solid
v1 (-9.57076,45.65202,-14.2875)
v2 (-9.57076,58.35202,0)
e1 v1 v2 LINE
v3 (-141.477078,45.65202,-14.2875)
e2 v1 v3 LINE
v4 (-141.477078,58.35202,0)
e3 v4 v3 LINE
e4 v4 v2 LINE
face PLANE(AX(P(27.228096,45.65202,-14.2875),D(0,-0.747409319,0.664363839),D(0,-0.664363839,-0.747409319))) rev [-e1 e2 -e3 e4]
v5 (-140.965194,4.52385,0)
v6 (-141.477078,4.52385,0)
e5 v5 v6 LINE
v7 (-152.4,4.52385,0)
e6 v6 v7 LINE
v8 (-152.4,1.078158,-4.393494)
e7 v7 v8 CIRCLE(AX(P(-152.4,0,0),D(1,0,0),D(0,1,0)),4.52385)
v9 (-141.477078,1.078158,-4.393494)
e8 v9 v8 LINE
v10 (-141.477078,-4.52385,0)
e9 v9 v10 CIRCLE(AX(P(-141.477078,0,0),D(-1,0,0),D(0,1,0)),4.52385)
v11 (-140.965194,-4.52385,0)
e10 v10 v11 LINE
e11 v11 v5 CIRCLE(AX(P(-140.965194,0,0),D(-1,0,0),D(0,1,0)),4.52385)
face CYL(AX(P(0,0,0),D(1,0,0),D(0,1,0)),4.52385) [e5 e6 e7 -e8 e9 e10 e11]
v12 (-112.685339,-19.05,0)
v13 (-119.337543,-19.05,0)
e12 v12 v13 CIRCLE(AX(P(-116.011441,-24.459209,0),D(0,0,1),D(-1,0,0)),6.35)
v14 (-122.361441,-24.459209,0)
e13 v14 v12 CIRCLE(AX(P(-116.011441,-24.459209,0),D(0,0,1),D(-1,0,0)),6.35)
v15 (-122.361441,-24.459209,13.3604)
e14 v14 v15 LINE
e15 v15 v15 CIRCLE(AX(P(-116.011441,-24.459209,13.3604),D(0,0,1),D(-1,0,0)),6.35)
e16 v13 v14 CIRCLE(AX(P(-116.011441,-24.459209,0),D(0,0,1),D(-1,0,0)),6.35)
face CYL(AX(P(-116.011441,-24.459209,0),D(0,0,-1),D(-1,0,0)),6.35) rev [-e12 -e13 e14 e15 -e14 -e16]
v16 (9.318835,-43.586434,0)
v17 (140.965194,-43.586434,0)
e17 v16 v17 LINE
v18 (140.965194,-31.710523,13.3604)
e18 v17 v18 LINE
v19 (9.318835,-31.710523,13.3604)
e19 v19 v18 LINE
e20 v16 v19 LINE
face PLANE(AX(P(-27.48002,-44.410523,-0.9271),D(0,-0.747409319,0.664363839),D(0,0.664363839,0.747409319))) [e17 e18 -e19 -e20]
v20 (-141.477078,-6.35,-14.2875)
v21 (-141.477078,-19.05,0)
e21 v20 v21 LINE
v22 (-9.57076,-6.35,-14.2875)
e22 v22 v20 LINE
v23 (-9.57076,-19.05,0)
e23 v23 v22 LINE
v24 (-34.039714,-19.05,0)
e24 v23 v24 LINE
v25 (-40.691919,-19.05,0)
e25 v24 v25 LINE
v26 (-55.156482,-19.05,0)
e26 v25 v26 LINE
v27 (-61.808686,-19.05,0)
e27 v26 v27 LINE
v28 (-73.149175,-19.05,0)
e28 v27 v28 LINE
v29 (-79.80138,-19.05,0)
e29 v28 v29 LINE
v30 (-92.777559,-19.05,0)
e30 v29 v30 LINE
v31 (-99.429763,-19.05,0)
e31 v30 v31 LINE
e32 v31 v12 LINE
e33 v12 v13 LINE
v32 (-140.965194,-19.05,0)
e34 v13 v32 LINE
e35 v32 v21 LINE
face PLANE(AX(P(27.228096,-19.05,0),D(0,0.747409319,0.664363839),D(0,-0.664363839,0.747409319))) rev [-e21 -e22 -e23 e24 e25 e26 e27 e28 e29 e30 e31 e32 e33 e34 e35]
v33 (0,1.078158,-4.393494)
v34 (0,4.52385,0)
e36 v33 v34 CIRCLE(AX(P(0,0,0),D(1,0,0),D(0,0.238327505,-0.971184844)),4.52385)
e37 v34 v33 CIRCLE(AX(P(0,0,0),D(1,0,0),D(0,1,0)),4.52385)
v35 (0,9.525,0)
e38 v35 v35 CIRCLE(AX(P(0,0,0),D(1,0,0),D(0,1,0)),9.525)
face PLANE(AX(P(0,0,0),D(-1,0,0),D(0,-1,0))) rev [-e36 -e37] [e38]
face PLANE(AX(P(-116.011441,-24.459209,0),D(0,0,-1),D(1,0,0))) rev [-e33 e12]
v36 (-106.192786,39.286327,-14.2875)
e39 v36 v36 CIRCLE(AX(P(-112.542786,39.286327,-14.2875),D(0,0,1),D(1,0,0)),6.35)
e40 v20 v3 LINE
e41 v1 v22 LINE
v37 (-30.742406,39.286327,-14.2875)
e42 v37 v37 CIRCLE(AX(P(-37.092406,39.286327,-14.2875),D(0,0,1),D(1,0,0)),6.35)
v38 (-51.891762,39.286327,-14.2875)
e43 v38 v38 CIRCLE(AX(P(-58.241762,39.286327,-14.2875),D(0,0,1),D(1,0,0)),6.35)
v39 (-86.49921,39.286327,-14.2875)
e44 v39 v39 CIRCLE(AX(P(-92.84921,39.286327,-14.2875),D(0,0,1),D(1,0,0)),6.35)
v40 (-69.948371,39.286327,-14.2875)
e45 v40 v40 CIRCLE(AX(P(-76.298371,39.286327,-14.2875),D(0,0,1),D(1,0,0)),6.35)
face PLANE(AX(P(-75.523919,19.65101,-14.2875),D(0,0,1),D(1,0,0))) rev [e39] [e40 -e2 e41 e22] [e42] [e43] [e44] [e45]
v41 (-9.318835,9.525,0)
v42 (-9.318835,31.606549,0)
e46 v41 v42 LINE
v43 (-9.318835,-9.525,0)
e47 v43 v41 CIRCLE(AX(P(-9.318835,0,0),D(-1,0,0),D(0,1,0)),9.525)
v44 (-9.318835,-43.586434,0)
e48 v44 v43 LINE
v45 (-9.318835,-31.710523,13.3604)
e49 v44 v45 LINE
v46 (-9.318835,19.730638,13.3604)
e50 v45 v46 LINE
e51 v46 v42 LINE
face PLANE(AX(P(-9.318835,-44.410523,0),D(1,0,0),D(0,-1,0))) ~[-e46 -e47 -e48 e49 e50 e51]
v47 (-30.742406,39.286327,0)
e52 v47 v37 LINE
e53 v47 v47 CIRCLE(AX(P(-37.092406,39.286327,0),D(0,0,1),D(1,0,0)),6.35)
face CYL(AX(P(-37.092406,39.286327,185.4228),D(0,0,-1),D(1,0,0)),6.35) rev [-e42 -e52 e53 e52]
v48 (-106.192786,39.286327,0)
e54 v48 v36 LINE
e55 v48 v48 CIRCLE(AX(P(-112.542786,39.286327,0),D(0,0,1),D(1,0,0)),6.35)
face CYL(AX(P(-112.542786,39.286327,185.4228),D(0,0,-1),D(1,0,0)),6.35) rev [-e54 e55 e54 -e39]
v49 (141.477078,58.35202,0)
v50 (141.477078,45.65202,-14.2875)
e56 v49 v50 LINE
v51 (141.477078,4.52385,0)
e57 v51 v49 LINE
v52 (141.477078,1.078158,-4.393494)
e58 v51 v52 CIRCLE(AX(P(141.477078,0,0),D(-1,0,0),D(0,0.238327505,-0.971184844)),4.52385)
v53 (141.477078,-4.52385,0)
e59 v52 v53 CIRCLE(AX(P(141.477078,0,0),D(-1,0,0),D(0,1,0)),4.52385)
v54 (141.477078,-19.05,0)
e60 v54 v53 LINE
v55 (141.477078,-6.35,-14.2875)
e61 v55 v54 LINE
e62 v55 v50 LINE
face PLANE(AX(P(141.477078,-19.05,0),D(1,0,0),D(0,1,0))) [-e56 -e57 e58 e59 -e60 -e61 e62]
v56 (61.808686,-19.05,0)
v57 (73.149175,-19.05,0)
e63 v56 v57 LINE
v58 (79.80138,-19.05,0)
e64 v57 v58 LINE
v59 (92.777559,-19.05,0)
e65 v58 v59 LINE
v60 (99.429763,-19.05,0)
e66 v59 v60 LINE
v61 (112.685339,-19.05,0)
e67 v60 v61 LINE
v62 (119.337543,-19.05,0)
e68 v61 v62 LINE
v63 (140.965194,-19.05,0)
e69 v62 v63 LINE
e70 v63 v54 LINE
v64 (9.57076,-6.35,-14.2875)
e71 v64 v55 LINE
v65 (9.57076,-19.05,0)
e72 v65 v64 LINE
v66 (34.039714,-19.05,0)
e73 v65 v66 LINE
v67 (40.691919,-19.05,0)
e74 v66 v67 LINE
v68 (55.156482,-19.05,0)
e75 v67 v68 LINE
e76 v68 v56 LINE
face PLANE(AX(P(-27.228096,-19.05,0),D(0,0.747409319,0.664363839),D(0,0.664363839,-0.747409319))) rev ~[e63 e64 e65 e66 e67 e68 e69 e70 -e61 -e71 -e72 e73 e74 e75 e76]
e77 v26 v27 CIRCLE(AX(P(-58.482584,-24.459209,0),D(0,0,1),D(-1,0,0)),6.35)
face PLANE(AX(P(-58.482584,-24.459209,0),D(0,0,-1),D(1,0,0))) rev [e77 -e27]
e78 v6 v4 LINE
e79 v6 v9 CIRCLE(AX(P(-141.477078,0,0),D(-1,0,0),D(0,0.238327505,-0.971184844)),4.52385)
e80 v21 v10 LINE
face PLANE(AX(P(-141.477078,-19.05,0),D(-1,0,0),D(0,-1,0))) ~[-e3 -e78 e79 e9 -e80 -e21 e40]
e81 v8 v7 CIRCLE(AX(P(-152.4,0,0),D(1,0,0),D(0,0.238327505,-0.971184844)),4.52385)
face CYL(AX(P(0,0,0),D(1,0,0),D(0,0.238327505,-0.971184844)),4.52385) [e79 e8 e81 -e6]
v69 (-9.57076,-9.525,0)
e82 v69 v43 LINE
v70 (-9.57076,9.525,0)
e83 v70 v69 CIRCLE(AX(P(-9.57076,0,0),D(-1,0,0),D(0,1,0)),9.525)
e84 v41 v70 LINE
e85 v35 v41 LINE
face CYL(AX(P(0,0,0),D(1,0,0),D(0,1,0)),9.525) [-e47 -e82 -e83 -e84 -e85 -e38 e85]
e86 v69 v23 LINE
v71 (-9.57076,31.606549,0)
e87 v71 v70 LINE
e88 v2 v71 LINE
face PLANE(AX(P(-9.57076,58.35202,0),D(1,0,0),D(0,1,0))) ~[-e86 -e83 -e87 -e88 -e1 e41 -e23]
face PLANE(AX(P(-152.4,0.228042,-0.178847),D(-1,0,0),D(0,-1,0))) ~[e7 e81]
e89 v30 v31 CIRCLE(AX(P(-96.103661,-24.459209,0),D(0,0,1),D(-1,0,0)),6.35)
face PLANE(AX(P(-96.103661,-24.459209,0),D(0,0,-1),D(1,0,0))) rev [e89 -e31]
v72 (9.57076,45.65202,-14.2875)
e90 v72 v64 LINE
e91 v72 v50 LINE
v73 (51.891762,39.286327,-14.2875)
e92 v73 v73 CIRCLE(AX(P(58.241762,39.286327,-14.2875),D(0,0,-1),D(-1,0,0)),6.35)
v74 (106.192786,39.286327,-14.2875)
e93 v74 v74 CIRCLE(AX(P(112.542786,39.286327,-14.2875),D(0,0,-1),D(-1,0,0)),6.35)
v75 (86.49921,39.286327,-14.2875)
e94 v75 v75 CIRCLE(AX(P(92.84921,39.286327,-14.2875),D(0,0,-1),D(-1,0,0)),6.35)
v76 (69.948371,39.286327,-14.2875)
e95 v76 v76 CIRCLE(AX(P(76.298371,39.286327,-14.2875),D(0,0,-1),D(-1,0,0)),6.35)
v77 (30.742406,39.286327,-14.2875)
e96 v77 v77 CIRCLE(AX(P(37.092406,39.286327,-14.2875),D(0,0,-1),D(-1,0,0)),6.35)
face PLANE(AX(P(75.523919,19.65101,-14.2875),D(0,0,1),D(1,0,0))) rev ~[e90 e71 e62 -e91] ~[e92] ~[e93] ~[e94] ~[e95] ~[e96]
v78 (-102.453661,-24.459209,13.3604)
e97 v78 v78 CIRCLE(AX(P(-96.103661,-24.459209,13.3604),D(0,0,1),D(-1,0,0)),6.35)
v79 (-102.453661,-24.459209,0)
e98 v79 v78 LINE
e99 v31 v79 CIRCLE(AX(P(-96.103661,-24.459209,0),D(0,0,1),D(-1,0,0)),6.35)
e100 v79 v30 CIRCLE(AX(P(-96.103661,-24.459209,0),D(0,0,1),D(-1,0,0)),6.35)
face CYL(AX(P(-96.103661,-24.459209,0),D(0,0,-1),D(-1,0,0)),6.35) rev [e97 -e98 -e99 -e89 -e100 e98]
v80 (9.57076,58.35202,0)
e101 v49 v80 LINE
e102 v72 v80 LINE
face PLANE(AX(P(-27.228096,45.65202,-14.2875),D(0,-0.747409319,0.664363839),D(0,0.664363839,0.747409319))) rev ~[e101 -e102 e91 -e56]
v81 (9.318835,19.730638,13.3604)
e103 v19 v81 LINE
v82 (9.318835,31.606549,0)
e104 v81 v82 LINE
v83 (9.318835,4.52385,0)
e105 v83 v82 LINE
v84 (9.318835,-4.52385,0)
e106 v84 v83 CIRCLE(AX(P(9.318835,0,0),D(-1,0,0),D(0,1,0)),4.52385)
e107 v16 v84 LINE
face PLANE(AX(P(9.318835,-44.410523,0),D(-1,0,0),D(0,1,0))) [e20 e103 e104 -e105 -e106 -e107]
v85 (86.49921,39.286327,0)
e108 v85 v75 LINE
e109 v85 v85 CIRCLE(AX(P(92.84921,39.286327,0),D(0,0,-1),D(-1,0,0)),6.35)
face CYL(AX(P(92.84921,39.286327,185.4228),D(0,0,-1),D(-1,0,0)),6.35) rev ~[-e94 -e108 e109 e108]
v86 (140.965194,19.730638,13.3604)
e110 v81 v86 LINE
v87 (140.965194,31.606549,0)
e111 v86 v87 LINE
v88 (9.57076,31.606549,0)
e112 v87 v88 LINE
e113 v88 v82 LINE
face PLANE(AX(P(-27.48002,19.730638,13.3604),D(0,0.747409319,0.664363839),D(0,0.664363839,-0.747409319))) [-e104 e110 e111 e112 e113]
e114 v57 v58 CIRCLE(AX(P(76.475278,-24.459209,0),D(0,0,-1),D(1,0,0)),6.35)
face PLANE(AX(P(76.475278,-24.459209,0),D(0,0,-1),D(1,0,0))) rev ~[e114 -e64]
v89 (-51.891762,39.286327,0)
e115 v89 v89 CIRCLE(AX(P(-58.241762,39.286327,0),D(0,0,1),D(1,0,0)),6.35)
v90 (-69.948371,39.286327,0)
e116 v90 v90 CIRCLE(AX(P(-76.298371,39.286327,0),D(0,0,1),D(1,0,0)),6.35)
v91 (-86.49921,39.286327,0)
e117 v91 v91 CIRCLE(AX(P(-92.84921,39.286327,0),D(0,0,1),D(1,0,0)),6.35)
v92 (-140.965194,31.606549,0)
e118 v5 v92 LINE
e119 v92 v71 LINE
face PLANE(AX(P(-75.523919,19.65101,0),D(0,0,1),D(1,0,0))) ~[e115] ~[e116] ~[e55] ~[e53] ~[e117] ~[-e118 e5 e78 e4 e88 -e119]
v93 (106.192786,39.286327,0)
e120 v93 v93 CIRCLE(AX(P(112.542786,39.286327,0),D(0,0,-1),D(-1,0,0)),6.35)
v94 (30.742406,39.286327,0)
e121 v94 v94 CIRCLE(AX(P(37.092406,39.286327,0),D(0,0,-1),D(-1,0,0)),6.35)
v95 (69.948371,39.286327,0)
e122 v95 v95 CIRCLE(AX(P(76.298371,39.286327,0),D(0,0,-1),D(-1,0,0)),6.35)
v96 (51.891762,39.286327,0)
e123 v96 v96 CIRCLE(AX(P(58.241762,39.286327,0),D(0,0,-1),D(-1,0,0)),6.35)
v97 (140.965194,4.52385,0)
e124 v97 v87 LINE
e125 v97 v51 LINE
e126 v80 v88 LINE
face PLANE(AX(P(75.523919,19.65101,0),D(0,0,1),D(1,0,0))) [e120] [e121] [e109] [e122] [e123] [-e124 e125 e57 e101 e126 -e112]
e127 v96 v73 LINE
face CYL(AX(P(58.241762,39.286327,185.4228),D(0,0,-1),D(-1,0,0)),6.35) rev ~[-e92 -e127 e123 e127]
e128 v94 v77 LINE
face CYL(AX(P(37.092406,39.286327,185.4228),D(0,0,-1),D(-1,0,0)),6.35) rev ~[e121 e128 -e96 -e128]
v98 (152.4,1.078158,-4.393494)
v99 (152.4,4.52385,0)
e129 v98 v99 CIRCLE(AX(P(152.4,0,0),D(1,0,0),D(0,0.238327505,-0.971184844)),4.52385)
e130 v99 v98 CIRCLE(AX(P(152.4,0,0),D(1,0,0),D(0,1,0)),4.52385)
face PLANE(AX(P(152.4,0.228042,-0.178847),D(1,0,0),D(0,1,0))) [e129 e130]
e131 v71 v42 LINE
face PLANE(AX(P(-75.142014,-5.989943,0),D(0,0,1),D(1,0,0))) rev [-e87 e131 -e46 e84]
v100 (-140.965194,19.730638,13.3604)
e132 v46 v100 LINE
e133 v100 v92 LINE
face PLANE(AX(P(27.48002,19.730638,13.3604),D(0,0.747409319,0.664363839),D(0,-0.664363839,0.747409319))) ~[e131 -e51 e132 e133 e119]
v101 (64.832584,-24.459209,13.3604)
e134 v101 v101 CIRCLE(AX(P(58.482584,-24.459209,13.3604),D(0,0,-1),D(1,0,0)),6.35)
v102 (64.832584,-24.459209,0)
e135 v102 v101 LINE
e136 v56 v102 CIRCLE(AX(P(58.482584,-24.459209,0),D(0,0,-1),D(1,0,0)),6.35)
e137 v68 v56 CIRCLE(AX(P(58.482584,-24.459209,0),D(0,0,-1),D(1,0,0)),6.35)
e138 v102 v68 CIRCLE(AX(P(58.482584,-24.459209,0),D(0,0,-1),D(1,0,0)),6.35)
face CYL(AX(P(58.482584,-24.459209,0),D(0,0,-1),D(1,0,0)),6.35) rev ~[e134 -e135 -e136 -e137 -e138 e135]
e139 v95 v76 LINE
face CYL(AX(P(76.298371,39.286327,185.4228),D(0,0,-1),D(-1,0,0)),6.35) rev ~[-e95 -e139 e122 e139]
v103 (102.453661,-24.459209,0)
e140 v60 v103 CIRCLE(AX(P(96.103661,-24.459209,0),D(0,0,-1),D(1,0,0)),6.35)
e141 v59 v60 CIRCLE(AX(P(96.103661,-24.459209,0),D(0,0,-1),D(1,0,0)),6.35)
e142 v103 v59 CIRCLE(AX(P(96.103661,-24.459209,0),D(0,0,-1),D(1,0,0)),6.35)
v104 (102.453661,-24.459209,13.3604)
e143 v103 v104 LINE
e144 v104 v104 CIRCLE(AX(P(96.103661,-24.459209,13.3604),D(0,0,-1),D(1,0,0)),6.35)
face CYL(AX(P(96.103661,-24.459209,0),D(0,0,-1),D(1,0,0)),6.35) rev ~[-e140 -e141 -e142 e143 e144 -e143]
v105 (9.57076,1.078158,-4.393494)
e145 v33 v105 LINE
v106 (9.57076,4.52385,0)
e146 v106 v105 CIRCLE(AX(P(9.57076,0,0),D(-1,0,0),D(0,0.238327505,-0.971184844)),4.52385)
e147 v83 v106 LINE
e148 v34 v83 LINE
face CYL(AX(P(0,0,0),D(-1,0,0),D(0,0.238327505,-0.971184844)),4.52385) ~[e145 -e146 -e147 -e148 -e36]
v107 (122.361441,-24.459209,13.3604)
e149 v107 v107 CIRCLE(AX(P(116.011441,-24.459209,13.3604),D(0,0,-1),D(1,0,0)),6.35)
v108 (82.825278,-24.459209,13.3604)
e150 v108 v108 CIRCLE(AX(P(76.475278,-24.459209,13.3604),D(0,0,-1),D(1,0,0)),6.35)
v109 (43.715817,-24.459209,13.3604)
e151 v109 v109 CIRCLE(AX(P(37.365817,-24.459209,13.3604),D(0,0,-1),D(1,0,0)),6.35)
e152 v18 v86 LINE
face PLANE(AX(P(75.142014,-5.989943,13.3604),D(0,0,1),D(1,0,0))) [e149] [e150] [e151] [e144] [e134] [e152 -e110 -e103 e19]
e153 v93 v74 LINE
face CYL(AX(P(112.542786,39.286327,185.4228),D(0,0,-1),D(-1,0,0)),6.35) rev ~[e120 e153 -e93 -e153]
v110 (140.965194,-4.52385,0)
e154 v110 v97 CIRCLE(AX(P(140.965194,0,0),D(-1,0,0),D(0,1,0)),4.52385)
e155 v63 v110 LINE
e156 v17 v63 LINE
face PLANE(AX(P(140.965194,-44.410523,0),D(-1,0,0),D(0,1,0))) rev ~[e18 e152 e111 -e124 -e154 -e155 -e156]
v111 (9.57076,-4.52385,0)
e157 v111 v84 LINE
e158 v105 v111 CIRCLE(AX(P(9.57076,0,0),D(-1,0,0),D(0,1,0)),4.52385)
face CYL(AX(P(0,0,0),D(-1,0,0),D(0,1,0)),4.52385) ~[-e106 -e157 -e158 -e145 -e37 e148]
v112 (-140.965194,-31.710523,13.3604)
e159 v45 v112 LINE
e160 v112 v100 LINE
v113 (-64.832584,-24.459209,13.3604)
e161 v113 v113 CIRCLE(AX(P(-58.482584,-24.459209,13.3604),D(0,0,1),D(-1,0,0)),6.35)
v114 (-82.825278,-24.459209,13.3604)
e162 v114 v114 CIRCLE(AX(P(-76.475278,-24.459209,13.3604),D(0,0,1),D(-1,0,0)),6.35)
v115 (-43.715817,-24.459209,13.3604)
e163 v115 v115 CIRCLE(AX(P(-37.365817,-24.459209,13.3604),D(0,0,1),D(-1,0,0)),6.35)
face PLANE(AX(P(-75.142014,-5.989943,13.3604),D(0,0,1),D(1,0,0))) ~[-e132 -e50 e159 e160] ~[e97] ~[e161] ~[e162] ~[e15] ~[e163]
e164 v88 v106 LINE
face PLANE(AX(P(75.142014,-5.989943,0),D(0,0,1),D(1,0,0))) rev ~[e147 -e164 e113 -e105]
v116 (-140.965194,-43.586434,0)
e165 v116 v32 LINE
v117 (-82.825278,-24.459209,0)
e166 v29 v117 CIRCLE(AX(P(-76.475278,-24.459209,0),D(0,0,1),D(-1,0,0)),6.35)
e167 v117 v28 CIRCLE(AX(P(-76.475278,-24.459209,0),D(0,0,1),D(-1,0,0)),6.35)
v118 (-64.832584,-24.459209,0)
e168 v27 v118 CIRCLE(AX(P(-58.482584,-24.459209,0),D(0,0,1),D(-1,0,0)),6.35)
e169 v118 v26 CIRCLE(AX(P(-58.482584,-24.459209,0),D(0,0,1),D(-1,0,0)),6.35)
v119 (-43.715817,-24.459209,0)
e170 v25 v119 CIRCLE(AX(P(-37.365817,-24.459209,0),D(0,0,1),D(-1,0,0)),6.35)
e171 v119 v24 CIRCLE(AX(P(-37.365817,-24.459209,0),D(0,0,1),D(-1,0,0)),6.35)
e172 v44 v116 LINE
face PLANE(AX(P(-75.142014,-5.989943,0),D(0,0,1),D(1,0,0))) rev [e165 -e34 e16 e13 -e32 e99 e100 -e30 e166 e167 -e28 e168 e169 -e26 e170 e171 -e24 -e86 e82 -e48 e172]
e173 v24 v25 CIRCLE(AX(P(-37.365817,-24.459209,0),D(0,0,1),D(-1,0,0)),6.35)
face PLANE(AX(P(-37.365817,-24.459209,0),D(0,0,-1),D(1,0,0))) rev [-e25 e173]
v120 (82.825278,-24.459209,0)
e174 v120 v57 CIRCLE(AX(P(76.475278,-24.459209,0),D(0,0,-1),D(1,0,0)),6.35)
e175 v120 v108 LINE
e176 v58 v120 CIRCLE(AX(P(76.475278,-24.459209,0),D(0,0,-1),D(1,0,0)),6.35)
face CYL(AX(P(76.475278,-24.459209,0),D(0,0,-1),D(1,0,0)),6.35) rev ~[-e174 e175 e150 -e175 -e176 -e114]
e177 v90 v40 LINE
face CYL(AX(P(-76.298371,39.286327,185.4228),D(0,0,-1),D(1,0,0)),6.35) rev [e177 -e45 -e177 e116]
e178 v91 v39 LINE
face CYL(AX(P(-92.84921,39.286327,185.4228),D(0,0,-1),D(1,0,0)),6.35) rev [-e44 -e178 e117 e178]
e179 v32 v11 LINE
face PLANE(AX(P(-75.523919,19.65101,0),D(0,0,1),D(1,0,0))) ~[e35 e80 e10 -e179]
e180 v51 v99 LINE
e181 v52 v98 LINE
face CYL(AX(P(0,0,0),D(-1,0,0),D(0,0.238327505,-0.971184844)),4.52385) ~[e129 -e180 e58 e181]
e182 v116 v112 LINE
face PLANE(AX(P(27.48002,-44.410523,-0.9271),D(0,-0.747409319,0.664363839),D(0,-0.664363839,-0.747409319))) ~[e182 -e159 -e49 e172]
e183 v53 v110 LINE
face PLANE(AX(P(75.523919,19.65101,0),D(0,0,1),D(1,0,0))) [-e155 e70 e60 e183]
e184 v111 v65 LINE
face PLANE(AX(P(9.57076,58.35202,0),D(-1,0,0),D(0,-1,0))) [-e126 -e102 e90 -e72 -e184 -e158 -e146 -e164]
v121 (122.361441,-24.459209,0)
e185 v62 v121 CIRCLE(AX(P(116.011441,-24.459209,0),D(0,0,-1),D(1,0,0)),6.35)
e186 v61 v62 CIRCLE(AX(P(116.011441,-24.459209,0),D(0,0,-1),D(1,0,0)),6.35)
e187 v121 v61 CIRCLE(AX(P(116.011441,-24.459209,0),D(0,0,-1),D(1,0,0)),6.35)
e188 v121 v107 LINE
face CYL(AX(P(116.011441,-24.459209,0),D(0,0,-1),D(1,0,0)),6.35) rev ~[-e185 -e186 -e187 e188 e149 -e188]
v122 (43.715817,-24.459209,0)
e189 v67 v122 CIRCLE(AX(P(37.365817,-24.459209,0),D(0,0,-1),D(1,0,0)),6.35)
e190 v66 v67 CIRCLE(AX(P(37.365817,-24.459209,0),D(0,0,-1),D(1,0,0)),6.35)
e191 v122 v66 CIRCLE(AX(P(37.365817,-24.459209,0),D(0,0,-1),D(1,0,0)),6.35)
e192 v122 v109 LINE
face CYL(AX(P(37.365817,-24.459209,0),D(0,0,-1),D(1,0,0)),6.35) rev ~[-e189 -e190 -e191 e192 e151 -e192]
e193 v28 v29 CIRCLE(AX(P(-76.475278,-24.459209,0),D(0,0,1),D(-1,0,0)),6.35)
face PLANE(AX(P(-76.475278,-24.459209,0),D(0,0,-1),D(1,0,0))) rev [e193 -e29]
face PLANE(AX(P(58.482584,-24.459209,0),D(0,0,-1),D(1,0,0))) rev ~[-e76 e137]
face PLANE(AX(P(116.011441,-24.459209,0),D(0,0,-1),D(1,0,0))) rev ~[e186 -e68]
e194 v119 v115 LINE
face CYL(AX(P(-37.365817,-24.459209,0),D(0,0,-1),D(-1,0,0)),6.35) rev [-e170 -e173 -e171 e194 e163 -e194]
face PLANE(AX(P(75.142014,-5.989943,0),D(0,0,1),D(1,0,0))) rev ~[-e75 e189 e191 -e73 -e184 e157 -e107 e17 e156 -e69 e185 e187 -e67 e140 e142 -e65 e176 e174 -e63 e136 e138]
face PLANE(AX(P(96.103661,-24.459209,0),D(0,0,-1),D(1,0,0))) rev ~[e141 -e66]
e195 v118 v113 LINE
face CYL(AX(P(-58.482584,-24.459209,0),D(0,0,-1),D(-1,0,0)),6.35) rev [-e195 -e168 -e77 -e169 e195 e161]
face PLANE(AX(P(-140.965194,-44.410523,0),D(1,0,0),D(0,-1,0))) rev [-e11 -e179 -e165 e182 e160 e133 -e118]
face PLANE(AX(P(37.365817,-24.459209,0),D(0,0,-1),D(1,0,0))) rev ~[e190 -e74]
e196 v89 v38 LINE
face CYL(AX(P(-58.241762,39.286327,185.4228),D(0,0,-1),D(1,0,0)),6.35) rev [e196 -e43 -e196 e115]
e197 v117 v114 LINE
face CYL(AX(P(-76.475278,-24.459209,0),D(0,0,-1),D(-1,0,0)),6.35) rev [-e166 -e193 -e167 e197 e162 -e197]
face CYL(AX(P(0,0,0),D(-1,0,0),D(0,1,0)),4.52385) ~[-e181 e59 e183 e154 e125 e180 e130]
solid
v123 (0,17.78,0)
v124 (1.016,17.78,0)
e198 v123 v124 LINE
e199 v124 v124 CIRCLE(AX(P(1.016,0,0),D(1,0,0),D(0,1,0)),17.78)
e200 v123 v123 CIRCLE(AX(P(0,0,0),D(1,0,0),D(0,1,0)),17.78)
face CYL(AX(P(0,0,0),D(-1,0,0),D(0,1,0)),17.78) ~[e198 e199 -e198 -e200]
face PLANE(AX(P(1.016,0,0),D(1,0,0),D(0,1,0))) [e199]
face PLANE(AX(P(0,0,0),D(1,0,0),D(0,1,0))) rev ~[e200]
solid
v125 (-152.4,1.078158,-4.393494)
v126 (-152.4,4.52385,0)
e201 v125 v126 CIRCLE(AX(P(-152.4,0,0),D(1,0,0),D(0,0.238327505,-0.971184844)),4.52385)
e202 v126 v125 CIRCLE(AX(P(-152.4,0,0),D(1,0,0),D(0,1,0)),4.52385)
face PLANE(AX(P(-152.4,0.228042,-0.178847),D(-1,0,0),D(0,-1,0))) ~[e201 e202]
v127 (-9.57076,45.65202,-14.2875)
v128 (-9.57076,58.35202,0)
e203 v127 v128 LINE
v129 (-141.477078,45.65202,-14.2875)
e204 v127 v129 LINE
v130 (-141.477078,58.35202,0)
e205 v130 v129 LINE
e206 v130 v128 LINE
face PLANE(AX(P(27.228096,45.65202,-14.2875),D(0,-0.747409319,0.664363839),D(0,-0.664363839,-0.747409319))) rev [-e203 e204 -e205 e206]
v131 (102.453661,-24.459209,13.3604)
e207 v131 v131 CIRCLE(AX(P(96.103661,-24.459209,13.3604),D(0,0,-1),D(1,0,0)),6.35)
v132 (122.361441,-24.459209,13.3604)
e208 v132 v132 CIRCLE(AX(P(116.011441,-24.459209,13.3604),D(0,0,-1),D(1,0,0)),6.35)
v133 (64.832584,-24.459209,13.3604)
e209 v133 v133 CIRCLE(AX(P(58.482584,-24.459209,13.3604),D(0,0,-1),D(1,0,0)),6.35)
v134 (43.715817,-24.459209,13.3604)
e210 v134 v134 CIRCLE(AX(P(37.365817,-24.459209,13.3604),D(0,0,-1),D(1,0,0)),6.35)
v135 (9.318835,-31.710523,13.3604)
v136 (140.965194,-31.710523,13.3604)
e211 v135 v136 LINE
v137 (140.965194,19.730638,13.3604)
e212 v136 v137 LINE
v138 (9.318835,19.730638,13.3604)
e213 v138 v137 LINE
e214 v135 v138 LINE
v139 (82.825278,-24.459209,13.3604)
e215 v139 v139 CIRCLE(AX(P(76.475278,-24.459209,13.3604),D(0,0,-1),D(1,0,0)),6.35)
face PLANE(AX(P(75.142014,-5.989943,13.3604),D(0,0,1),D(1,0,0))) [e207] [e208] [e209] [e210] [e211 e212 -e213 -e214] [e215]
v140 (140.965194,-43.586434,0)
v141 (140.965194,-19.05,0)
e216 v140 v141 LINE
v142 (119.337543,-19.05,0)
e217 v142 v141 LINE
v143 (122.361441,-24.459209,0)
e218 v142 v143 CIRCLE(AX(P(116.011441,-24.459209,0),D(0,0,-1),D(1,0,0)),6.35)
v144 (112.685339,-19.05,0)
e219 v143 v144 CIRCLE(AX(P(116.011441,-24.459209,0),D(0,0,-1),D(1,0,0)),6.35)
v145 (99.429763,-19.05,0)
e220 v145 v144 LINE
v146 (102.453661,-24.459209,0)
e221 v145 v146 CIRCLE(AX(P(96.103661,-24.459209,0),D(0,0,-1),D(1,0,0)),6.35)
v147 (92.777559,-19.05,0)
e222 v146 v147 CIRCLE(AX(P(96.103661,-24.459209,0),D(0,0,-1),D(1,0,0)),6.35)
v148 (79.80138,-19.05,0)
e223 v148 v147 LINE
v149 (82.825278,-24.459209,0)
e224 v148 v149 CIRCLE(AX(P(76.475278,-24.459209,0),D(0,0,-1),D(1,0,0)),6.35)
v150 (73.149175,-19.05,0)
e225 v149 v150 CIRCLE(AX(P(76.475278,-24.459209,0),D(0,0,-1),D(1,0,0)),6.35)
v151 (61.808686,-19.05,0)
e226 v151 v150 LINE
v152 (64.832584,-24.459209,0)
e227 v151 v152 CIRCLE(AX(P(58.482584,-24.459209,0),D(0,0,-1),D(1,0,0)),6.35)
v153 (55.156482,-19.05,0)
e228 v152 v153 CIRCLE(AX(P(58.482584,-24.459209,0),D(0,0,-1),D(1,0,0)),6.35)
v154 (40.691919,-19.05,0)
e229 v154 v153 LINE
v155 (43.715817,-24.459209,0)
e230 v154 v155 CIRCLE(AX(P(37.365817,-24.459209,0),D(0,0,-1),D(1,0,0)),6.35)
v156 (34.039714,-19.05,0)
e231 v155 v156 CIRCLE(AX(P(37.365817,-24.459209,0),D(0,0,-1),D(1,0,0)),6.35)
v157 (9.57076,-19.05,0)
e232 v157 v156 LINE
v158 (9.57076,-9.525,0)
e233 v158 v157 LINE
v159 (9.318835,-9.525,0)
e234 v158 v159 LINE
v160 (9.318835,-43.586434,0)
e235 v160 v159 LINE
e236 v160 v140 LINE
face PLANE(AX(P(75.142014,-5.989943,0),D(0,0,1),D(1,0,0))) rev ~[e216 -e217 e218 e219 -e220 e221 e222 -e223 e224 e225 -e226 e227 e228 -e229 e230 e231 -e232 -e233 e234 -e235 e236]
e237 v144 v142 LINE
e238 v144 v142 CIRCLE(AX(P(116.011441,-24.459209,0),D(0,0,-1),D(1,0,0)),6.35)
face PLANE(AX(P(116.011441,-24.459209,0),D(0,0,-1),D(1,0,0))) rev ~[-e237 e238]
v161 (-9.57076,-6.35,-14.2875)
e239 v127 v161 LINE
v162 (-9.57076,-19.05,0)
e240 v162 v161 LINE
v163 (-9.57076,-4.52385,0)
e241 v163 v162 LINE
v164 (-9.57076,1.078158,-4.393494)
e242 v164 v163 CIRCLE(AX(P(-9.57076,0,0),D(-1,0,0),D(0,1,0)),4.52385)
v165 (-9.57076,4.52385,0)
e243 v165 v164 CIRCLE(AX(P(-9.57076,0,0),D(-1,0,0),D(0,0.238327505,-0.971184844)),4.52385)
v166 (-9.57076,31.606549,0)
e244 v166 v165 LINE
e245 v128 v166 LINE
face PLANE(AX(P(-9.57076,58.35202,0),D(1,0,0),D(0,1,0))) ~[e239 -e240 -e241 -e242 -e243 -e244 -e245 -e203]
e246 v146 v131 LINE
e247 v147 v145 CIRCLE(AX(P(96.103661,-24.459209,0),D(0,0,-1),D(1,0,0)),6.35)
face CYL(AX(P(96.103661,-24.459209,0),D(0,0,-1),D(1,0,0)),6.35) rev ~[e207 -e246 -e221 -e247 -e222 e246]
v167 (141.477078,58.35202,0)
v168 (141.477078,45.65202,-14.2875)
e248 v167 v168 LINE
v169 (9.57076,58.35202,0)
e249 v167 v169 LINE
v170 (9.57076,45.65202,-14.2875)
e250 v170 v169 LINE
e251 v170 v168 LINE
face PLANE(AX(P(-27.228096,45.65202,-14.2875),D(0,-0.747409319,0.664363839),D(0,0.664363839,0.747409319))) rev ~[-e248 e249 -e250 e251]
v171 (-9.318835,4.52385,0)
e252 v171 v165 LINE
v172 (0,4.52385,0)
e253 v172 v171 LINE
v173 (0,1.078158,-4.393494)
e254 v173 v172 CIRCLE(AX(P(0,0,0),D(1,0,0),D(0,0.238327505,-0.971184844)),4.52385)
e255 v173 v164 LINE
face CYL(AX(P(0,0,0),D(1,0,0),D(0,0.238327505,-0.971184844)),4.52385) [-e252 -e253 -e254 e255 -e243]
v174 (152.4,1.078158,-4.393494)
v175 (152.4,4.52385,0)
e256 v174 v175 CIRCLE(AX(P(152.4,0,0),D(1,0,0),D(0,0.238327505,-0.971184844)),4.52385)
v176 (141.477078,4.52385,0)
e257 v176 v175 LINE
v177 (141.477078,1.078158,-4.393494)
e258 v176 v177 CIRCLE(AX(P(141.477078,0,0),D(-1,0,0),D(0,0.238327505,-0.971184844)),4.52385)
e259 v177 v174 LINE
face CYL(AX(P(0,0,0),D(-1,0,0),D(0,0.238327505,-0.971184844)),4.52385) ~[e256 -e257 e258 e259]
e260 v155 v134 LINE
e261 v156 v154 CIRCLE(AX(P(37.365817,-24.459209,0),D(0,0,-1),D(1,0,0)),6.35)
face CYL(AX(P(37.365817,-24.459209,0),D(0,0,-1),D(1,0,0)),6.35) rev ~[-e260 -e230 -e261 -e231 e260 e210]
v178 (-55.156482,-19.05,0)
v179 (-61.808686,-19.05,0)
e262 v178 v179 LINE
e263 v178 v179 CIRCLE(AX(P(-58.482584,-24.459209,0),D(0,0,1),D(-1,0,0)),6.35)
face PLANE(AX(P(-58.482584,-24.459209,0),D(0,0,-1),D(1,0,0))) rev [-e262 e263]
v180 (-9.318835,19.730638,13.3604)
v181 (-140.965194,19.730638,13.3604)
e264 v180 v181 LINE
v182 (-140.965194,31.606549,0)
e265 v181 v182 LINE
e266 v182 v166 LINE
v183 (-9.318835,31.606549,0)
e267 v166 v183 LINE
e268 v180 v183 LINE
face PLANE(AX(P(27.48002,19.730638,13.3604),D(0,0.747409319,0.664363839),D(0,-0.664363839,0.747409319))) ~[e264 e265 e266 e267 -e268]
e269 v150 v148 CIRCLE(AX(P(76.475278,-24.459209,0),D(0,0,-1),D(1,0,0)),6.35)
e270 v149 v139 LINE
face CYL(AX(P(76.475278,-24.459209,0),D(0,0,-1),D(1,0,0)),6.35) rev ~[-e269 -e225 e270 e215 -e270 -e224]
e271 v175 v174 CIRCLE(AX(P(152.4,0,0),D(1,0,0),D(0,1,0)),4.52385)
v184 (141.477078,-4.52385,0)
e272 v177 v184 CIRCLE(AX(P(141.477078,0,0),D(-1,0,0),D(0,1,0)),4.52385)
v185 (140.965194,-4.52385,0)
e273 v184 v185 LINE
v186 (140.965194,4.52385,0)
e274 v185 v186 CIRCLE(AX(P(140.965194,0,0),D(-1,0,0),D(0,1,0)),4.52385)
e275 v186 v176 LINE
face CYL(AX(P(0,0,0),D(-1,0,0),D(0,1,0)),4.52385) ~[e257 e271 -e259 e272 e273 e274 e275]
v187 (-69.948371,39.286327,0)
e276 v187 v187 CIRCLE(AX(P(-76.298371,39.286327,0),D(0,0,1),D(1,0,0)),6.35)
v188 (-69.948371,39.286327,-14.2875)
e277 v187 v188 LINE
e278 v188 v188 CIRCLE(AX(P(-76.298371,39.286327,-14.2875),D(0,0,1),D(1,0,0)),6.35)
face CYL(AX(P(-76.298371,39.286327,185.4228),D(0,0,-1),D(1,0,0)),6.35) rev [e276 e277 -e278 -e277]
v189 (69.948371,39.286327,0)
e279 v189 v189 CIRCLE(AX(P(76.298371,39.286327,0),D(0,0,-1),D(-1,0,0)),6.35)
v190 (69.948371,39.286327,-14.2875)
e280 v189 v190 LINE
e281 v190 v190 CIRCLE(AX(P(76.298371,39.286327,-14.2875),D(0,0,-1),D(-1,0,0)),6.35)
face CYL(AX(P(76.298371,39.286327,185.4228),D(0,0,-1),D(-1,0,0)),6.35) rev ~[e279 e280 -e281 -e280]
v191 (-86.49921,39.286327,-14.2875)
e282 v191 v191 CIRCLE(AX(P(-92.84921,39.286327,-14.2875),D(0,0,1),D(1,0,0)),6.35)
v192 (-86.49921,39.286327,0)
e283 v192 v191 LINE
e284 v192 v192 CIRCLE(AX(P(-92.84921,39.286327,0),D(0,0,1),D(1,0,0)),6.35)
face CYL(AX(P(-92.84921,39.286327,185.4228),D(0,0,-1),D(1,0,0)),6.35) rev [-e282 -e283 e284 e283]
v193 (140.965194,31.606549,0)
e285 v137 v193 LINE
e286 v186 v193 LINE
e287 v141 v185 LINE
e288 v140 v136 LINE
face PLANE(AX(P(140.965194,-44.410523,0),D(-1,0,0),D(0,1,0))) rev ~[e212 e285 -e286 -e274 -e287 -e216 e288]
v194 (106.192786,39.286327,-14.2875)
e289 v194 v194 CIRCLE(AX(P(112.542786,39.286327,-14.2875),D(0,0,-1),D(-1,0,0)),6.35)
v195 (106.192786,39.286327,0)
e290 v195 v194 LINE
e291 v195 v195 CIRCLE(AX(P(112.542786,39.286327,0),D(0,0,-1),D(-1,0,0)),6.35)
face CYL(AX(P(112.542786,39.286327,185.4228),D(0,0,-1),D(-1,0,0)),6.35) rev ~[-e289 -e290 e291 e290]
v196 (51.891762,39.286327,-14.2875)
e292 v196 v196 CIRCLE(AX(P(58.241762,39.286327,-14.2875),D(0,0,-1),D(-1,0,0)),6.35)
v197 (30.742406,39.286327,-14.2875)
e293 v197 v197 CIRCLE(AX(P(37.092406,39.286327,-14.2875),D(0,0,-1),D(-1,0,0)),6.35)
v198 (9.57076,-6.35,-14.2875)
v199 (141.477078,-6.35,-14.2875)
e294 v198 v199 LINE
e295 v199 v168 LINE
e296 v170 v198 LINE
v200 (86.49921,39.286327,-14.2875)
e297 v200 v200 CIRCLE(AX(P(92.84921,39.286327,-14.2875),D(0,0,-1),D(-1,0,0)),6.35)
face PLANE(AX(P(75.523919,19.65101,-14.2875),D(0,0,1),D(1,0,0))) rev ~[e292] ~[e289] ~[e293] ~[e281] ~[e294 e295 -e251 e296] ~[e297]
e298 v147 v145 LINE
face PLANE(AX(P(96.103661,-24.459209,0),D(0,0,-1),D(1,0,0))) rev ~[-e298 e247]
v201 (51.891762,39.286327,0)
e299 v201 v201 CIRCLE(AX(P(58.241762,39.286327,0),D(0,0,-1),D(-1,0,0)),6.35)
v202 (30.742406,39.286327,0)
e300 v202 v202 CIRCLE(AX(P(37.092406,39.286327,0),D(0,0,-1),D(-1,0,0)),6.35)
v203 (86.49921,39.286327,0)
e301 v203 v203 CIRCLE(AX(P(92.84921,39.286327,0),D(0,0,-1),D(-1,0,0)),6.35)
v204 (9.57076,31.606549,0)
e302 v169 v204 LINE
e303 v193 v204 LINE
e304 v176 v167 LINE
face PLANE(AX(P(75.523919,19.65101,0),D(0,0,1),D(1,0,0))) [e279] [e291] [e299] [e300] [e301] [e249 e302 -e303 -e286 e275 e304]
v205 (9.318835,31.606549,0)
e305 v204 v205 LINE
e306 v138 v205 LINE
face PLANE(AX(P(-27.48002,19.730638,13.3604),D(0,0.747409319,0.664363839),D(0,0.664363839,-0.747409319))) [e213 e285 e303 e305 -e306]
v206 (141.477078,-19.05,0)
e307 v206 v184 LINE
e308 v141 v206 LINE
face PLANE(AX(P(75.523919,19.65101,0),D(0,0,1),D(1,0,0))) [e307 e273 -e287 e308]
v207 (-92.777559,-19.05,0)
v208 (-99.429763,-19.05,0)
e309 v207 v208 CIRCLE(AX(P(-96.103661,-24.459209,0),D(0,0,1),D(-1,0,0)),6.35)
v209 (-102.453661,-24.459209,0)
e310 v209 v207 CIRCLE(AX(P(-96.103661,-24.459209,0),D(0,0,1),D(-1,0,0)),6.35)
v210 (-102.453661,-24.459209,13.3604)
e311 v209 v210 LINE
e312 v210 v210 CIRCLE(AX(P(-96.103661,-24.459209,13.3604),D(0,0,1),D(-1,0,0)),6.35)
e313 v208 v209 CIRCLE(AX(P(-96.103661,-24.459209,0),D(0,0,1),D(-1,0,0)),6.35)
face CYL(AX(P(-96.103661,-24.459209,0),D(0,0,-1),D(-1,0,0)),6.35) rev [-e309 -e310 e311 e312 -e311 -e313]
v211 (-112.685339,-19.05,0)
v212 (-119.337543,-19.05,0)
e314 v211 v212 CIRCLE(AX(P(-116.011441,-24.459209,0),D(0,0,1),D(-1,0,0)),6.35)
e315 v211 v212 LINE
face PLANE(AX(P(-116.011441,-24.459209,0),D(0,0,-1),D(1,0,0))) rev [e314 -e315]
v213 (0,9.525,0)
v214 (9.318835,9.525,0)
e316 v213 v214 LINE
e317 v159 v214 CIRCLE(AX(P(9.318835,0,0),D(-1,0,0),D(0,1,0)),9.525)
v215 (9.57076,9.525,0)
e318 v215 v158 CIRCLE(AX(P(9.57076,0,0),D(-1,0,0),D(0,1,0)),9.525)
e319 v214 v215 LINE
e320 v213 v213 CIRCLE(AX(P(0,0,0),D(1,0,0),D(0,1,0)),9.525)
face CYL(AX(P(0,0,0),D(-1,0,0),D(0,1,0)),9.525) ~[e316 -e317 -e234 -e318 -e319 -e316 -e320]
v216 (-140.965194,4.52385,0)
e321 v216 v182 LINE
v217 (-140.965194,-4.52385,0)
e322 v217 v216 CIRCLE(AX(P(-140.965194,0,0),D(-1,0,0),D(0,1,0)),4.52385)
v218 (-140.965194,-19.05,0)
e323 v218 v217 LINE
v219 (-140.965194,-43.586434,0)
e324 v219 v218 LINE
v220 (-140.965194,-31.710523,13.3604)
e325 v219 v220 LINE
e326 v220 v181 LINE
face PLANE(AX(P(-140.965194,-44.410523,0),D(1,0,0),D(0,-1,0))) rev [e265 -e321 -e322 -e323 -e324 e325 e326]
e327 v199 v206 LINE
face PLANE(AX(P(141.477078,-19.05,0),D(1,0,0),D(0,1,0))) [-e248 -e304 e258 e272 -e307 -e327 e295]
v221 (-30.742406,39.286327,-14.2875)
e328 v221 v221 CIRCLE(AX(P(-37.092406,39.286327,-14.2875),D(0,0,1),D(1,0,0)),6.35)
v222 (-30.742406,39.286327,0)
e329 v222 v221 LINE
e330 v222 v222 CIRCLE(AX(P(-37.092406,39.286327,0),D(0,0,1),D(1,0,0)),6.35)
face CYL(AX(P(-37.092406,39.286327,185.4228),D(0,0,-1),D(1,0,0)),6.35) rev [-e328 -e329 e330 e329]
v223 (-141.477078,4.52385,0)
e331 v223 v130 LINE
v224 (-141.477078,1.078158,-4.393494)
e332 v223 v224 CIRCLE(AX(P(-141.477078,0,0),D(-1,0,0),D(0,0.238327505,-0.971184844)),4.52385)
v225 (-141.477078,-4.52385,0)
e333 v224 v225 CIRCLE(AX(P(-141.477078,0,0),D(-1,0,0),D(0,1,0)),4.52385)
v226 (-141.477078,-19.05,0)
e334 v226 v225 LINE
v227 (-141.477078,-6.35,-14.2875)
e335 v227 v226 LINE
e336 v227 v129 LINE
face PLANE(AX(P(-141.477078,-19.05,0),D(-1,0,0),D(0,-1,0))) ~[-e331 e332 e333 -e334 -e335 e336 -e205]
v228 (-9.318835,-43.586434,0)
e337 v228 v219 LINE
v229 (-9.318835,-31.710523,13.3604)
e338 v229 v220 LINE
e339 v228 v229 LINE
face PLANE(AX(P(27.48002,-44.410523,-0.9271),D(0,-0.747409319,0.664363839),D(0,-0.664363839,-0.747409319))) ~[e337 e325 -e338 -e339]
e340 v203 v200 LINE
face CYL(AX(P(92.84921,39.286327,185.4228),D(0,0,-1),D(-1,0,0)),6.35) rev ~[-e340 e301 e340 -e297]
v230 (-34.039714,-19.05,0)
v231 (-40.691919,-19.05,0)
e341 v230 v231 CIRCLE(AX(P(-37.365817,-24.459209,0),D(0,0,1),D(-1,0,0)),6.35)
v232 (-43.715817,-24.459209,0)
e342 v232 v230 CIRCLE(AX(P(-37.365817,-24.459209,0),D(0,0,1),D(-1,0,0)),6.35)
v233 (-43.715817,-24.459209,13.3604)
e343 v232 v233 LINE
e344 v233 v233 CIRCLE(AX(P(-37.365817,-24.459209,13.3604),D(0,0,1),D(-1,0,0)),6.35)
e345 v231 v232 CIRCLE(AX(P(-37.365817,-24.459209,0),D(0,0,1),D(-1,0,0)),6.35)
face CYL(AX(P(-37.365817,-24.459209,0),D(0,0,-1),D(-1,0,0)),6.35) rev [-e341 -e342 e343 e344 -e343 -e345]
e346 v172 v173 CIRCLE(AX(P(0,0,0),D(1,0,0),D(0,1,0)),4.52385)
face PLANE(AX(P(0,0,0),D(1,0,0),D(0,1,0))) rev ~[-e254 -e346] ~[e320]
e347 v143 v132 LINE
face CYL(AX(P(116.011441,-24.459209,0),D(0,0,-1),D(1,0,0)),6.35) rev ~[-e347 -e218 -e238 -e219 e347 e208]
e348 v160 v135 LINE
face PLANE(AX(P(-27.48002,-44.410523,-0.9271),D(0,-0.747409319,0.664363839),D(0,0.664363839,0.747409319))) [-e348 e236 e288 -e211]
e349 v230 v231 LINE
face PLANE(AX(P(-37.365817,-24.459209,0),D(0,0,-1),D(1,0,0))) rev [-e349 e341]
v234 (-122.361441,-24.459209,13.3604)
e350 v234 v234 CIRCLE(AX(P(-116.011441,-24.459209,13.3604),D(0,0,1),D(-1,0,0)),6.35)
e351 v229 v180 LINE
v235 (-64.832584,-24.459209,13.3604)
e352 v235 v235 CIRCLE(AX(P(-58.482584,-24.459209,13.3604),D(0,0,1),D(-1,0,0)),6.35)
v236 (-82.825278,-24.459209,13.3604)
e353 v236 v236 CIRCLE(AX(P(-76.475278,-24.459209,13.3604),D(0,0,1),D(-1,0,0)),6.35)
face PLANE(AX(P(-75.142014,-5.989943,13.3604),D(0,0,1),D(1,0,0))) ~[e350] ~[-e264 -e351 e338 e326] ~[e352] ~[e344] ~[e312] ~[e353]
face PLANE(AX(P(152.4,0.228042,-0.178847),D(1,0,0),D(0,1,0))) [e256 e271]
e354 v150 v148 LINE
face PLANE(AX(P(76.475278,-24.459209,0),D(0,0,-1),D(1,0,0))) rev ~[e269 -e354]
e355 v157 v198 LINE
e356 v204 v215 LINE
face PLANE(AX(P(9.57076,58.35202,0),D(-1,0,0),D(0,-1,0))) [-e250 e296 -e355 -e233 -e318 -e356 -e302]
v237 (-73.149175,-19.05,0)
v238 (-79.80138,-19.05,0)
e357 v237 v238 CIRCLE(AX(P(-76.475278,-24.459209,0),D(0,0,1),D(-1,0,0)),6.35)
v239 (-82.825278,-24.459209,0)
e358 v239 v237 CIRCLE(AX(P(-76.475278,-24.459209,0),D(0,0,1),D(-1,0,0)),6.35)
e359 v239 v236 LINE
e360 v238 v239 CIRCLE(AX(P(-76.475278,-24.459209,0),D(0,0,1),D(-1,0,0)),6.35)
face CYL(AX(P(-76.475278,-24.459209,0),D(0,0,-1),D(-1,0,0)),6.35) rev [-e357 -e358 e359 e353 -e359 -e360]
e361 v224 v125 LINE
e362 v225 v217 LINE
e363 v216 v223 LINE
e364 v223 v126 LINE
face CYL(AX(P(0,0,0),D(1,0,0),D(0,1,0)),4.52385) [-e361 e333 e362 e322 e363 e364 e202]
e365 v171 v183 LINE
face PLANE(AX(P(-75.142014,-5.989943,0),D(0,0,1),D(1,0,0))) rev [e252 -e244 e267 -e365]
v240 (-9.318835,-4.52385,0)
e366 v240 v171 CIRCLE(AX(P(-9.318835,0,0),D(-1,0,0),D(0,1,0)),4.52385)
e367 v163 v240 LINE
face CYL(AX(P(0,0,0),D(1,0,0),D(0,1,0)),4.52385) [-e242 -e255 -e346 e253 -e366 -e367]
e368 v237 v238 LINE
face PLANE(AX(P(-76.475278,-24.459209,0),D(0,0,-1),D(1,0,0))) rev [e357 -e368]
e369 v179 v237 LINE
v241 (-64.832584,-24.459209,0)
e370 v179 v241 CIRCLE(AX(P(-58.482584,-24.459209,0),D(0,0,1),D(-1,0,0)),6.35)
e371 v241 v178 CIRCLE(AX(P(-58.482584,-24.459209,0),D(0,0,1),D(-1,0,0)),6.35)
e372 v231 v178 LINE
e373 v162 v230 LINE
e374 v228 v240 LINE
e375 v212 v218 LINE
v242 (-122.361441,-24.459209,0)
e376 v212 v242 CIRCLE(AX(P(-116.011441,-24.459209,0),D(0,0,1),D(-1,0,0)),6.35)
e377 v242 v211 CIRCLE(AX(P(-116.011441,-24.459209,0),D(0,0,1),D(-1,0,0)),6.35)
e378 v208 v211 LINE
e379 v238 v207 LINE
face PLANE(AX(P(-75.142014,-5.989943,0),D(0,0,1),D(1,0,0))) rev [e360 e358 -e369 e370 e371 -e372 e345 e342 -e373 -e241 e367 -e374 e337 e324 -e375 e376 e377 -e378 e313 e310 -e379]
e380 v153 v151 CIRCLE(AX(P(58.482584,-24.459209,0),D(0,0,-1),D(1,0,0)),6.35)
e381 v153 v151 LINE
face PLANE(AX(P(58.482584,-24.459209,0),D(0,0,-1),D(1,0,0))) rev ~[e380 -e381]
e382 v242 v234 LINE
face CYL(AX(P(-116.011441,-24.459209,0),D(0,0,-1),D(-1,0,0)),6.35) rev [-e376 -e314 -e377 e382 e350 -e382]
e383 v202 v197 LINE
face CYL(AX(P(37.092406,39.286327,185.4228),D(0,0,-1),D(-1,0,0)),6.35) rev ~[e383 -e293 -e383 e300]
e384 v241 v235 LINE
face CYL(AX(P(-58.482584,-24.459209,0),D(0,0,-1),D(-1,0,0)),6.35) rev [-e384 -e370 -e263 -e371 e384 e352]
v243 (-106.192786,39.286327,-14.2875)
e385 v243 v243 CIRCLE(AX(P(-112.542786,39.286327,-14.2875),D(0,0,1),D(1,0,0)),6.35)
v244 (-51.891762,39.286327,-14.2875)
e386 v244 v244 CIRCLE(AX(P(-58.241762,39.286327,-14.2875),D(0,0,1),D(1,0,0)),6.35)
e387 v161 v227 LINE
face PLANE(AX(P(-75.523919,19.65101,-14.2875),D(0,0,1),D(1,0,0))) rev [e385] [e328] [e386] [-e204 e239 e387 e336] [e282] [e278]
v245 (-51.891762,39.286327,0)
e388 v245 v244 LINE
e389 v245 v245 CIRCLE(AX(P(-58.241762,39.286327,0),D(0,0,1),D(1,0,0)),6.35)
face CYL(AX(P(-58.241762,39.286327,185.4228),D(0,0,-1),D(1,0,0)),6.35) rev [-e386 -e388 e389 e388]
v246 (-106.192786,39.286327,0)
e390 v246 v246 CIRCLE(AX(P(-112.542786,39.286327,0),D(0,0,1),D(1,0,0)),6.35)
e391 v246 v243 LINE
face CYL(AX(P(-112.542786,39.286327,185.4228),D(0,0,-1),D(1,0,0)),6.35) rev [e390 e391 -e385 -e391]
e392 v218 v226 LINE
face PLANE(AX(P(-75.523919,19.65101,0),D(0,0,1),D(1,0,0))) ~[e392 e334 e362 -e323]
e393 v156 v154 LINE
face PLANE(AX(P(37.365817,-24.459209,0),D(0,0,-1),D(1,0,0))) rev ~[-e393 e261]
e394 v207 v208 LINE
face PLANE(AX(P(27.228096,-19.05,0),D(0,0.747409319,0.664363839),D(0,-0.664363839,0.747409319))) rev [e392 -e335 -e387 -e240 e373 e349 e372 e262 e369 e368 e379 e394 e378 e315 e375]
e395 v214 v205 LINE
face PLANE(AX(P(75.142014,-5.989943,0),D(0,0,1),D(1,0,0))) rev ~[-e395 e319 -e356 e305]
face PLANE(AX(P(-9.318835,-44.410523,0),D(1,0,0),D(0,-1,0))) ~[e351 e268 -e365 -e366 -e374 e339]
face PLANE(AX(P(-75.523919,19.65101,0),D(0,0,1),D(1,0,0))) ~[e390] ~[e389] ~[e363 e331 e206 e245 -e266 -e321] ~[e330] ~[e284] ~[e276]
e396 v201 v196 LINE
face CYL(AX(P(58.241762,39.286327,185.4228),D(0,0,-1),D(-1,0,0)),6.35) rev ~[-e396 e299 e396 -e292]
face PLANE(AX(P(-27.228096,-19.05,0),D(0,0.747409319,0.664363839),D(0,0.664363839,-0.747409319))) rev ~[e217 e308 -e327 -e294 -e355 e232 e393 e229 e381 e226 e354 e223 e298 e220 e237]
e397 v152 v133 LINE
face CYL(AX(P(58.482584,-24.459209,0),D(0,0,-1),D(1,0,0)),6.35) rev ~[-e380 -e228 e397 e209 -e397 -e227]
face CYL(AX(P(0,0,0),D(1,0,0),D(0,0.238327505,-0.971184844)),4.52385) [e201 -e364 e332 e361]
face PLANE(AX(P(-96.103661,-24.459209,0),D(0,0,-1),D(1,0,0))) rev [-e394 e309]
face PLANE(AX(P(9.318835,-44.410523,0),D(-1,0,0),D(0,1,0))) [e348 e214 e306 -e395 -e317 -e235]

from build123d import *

# Parameters (mm, degrees)
F1_DEPTH     = 152.4
F4_W         = 131.646358408
F4_H         = 76.841160655
F5_DEPTH     = 13.3604
F6_T1_DEPTH  = 205.2440690488
F7_T1_DEPTH  = 205.2440690488
F9_DEPTH     = 14.2875
F10_T1_DEPTH = 205.504029119
F10_T6_DEPTH = 205.504029119
F13_D        = 12.7
F15_D        = 12.7
F15_DEPTH    = 13.3614
F17_R        = 9.525
F18_DEPTH    = 25.4
F20_R        = 17.78
F21_DEPTH    = 1.016


# Not quite as in the source:
# - a fillet or chamfer that OpenCascade refuses, or shapes differently, is made with other operations: its cross-section is extruded or revolved along the edge and cut away or added
# - two fillets or chamfers of one size are made in one step
# - a feature names something its author has since deleted; it is built from what else it names


with BuildPart() as f1:
    # F0 (on Right) → F1 (new body)
    with BuildSketch(Plane.YZ):
        with BuildLine():
            ThreePointArc((1.0781578021, -4.3934942223), (3.559679728, -2.7917549967), (4.523849658, 0))
            ThreePointArc((4.523849658, 0), (-3.559679728, 2.7917549967), (1.0781578021, -4.3934942223))
        make_face()
    extrude(amount=F1_DEPTH)

    # F4 (on Top) → F5 (join)
    with BuildSketch(Plane.XY):
        with Locations((75.142014306, -5.9899426997)):
            Rectangle(F4_W, F4_H)
    extrude(amount=F5_DEPTH)

    # F6: chamfer of 12.7 x 14.2875 on 1 edges, made by hand

    # F6_s2 → F6_t1 (cut)
    with BuildSketch(Plane.YZ.offset(-27.4800202183)):
        Polygon((-44.4105230272, -0.9271), (-31.7105230272, 13.3604), (-44.4105230272, 13.3604), align=None)
    extrude(amount=F6_T1_DEPTH, mode=Mode.SUBTRACT)

    # F7: chamfer of 14.2875 x 12.7 on 1 edges, made by hand

    # F7_s2 → F7_t1 (cut)
    with BuildSketch(Plane.YZ.offset(-27.4800202183)):
        Polygon((19.7306376278, 13.3604), (32.4306376278, -0.9271), (32.4306376278, 13.3604), align=None)
    extrude(amount=F7_T1_DEPTH, mode=Mode.SUBTRACT)

    # F8 (on Top) → F9 (join)
    with BuildSketch(Plane.XY):
        Polygon((9.5707597211, 58.3520196378), (9.5707597211, 0), (9.5707597211, -19.05), (141.4770781994, -19.05), (141.4770781994, 58.3520196378), align=None)
    extrude(amount=-F9_DEPTH)

    # F10: chamfer of 12.7 x 14.2875 on 2 edges, made by hand

    # F10_s2 → F10_t1 (cut)
    with BuildSketch(Plane.YZ.offset(-27.2280955993)):
        Polygon((45.6520196378, -14.2875), (58.3520196378, 0), (58.3520196378, -14.2875), align=None)
    extrude(amount=F10_T1_DEPTH, mode=Mode.SUBTRACT)


with BuildPart() as f10_tool4:
    # F10_s5 → F10_t6 (new body)
    with BuildSketch(Plane.YZ.offset(-27.2280955993)):
        Polygon((-19.05, 0), (-6.35, -14.2875), (-19.05, -14.2875), align=None)
    extrude(amount=F10_T6_DEPTH)

    split(bisect_by=Plane.XY, keep=Keep.BOTTOM)


with BuildPart() as f1_1:
    add(f1.part)

    # F10_t3: cut F10_tool4
    add(f10_tool4.part, mode=Mode.SUBTRACT)

    # F13 (through all)
    with Locations(Plane.XY):
        with Locations((76.2983709574, 39.286326617), (92.8492099047, 39.286326617), (112.5427857041, 39.286326617), (58.2417622209, 39.286326617), (37.0924063027, 39.286326617)):
            Hole(F13_D / 2)

    # F15 (through all, one way)
    with BuildSketch(Plane(origin=(0, 0, 0), x_dir=(1, 0, 0), z_dir=(0, 0, -1))):
        with Locations((116.0114407539, 24.4592092931), (96.1036607623, 24.4592092931), (76.4752775431, 24.4592092931), (37.3658165336, 24.4592092931), (58.4825836122, 24.4592092931)):
            Circle(F15_D / 2)
    extrude(amount=-F15_DEPTH, mode=Mode.SUBTRACT)

    # F16: F1 across plane


with BuildPart() as f1_2:
    add(f1_1.part)
    add(f1_1.part.mirror(Plane.YZ))

    # F17 (on Right) → F18 (join)
    with BuildSketch(Plane.YZ):
        Circle(F17_R)
    extrude(amount=F18_DEPTH)


with BuildPart() as f19_1:
    # F19: instance of F1
    add(f1_2.part.mirror(Plane.YZ))


with BuildPart() as f21:
    # F20 (on Right) → F21 (new body)
    with BuildSketch(Plane.YZ):
        Circle(F20_R)
    extrude(amount=F21_DEPTH)


solid = Compound([f1_2.part, f19_1.part, f21.part])
